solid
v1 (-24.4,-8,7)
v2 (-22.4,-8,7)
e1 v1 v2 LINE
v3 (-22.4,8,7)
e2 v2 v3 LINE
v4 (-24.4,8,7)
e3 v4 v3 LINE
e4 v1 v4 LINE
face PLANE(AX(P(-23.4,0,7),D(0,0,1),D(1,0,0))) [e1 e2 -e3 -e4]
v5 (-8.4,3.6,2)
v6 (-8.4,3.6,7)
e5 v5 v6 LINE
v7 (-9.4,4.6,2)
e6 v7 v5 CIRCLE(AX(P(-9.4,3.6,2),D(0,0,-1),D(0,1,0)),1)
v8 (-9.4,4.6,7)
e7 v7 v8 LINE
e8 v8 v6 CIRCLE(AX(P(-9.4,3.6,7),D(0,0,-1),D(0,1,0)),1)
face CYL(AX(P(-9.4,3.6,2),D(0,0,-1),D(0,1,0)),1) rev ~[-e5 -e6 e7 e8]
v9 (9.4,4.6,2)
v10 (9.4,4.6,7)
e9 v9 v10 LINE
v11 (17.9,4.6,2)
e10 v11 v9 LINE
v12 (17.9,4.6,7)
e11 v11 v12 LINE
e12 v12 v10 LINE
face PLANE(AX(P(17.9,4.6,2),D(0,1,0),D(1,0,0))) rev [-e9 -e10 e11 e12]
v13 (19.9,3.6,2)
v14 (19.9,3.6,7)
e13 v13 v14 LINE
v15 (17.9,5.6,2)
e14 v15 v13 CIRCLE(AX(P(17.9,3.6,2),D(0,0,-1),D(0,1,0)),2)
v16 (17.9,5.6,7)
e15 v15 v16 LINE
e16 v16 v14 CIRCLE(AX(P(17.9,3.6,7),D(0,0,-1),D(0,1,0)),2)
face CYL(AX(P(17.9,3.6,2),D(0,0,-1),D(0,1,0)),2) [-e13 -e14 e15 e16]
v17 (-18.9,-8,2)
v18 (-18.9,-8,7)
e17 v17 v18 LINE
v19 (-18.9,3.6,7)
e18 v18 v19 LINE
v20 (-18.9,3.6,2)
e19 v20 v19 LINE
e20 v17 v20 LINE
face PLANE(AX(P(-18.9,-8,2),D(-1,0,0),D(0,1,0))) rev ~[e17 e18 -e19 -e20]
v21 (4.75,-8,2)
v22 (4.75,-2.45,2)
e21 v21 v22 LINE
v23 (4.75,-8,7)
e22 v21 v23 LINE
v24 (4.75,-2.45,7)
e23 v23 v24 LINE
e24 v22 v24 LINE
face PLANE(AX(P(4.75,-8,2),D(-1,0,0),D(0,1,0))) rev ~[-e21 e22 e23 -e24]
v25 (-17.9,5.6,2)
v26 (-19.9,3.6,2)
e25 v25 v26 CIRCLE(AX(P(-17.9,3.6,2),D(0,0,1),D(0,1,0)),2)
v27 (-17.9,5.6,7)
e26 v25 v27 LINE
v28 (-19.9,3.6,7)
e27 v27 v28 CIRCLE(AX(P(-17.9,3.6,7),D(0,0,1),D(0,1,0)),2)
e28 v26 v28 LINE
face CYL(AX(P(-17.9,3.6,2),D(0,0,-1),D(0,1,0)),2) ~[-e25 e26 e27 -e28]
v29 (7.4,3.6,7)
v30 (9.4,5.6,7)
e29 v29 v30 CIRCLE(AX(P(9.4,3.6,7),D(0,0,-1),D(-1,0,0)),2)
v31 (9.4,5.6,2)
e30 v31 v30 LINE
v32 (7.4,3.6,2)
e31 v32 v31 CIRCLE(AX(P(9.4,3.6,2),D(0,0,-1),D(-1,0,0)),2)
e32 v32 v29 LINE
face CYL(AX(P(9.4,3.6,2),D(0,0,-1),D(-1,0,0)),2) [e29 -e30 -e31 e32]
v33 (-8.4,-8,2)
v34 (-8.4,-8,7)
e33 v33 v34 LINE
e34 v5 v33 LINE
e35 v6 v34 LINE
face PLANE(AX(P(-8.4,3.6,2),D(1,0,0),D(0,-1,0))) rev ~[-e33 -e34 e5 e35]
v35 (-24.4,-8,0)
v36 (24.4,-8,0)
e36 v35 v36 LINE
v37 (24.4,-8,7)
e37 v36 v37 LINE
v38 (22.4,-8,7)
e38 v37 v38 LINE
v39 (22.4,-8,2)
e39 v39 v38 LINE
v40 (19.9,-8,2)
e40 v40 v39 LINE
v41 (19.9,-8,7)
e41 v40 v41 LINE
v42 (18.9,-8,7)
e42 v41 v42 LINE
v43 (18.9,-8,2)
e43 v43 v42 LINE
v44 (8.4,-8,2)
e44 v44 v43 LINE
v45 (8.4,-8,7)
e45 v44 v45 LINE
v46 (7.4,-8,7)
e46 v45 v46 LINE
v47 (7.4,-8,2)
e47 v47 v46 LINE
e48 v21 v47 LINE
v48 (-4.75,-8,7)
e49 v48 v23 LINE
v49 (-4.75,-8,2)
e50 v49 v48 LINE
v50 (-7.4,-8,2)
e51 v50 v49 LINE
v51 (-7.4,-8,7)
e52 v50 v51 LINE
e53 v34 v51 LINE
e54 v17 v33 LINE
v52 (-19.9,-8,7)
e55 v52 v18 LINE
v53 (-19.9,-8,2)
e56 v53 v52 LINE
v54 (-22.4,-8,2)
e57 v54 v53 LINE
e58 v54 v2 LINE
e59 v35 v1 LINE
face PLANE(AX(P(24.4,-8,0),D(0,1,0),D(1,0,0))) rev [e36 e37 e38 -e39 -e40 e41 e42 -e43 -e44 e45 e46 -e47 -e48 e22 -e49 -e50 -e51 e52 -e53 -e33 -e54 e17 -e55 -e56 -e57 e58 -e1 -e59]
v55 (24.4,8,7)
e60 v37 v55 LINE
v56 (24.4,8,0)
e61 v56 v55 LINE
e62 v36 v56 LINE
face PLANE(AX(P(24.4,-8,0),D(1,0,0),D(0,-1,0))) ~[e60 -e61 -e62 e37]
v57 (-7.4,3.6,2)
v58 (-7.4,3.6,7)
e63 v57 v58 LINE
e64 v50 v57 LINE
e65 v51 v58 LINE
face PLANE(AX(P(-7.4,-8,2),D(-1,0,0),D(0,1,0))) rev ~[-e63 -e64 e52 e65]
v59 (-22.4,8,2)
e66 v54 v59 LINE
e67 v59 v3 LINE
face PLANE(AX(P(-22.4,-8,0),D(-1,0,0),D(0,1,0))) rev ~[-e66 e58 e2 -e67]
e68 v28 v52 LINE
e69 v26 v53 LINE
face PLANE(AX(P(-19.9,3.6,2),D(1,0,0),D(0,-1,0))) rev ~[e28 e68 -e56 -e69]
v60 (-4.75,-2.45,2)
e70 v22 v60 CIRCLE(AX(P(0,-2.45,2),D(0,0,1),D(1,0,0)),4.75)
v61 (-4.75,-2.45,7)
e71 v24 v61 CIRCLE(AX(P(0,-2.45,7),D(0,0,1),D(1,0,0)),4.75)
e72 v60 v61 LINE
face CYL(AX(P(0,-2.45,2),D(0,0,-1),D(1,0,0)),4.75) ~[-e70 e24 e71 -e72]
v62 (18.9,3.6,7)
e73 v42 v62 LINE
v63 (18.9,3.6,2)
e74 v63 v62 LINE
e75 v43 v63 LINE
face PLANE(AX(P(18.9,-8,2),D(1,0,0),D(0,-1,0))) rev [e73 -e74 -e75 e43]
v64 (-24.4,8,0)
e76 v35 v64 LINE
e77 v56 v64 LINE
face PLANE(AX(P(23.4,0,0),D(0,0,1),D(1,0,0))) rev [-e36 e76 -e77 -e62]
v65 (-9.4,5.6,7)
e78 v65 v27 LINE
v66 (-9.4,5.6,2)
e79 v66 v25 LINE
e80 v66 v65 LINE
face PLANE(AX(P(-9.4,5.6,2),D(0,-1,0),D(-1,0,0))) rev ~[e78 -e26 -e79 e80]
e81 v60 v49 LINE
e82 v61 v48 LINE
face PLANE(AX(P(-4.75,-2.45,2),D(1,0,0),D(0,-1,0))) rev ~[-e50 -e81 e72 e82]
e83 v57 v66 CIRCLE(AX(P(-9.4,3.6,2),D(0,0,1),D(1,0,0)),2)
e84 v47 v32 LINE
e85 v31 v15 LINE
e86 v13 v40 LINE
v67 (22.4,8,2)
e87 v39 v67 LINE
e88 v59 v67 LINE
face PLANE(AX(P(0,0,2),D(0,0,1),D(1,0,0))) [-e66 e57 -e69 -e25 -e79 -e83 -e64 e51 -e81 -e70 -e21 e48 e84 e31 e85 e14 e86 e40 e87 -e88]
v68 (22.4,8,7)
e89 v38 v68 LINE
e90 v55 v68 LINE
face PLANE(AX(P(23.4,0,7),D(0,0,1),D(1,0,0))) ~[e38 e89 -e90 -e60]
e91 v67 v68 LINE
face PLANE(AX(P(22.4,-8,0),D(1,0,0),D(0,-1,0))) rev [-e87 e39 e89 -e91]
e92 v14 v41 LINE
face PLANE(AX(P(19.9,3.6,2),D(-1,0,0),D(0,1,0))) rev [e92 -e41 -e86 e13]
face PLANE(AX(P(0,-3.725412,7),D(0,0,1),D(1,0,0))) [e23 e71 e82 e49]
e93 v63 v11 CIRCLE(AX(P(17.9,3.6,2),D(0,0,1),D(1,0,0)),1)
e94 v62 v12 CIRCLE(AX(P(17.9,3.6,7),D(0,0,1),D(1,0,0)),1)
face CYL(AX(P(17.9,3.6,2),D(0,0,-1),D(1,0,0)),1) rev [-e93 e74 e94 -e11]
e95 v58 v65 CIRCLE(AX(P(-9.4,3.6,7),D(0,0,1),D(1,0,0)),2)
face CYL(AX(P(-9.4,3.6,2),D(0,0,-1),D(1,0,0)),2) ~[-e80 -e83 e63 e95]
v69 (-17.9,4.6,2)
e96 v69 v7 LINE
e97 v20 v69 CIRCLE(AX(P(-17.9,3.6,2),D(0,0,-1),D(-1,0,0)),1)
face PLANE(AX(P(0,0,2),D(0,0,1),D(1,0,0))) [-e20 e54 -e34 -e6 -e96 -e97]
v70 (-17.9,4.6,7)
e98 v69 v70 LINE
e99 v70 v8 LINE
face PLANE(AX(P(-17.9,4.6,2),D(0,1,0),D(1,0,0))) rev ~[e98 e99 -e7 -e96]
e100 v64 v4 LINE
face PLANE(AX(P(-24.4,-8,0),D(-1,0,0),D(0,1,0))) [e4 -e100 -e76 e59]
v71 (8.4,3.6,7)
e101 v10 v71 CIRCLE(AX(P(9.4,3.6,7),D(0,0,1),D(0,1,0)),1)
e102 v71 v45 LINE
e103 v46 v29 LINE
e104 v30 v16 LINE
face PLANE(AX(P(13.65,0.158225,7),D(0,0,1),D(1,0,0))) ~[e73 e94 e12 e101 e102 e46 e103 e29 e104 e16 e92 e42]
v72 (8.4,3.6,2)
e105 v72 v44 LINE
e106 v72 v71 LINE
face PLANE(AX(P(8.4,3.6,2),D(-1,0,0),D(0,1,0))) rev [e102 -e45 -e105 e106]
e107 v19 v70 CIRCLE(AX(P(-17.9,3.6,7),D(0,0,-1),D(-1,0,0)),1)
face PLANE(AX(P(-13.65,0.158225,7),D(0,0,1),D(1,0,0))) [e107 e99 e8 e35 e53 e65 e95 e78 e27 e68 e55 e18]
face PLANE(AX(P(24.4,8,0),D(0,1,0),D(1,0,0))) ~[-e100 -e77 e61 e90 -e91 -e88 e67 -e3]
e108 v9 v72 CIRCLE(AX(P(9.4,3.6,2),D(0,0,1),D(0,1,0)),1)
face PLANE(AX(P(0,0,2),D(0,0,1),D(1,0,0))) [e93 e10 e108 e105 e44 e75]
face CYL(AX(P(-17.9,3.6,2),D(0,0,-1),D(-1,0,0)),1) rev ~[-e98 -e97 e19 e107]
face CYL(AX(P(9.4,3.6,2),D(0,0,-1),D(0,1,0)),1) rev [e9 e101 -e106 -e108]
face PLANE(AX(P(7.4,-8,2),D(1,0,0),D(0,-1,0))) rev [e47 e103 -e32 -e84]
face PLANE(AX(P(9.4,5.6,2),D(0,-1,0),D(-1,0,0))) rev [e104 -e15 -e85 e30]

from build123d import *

# Parameters (mm, degrees)
F0_W     = 44.8
F0_H     = 16
F1_DEPTH = 2
F4_DEPTH = 5
F5_DEPTH = 5
F6_W     = 2
F6_H     = 16
F7_DEPTH = 7


# Not quite as in the source:
# - a pattern or mirror of a feature is missing from the dataset's text; its kind, count and spacing are read off the source's solid


with BuildPart() as f1:
    # F0 (on Top) → F1 (new body)
    with BuildSketch(Plane.XY):
        Rectangle(F0_W, F0_H)
    extrude(amount=F1_DEPTH)

    # F2 (on face) → F4 (join)
    with BuildSketch(Plane.XY.offset(2)):
        with BuildLine():
            Line((-19.9, 3.6), (-19.9, -8))
            Line((-19.9, -8), (-18.9, -8))
            Line((-18.9, -8), (-18.9, 3.6))
            ThreePointArc((-18.9, 3.6), (-18.6071067812, 4.3071067812), (-17.9, 4.6))
            Line((-17.9, 4.6), (-9.4, 4.6))
            ThreePointArc((-9.4, 4.6), (-8.6928932188, 4.3071067812), (-8.4, 3.6))
            Line((-8.4, 3.6), (-8.4, -8))
            Line((-8.4, -8), (-7.4, -8))
            Line((-7.4, -8), (-7.4, 3.6))
            ThreePointArc((-7.4, 3.6), (-7.9857864376, 5.0142135624), (-9.4, 5.6))
            Line((-9.4, 5.6), (-17.9, 5.6))
            ThreePointArc((-17.9, 5.6), (-19.3142135624, 5.0142135624), (-19.9, 3.6))
        make_face()
    f4 = extrude(amount=F4_DEPTH)

    # F4_copies: F4 across plane
    add(f4.mirror(Plane(origin=(0, 0, 0), x_dir=(0, 0, 1), z_dir=(1, 0, 0))))

    # F3 (on face) → F5 (join)
    with BuildSketch(Plane.XY.offset(2)):
        with BuildLine():
            Line((4.75, -8), (4.75, -2.45))
            ThreePointArc((4.75, -2.45), (0, 2.3), (-4.75, -2.45))
            Line((-4.75, -2.45), (-4.75, -8))
            Line((-4.75, -8), (4.75, -8))
        make_face()
    extrude(amount=F5_DEPTH)

    # F6 (on Top) → F7 (join, through all)
    with BuildSketch(Plane.XY):
        with Locations((-23.4, 0)):
            Rectangle(F6_W, F6_H)
    f7 = extrude(amount=F7_DEPTH)

    # F7_copies: F7 across plane
    add(f7.mirror(Plane(origin=(0, 0, 0), x_dir=(0, 0, 1), z_dir=(1, 0, 0))))


solid = f1.part
